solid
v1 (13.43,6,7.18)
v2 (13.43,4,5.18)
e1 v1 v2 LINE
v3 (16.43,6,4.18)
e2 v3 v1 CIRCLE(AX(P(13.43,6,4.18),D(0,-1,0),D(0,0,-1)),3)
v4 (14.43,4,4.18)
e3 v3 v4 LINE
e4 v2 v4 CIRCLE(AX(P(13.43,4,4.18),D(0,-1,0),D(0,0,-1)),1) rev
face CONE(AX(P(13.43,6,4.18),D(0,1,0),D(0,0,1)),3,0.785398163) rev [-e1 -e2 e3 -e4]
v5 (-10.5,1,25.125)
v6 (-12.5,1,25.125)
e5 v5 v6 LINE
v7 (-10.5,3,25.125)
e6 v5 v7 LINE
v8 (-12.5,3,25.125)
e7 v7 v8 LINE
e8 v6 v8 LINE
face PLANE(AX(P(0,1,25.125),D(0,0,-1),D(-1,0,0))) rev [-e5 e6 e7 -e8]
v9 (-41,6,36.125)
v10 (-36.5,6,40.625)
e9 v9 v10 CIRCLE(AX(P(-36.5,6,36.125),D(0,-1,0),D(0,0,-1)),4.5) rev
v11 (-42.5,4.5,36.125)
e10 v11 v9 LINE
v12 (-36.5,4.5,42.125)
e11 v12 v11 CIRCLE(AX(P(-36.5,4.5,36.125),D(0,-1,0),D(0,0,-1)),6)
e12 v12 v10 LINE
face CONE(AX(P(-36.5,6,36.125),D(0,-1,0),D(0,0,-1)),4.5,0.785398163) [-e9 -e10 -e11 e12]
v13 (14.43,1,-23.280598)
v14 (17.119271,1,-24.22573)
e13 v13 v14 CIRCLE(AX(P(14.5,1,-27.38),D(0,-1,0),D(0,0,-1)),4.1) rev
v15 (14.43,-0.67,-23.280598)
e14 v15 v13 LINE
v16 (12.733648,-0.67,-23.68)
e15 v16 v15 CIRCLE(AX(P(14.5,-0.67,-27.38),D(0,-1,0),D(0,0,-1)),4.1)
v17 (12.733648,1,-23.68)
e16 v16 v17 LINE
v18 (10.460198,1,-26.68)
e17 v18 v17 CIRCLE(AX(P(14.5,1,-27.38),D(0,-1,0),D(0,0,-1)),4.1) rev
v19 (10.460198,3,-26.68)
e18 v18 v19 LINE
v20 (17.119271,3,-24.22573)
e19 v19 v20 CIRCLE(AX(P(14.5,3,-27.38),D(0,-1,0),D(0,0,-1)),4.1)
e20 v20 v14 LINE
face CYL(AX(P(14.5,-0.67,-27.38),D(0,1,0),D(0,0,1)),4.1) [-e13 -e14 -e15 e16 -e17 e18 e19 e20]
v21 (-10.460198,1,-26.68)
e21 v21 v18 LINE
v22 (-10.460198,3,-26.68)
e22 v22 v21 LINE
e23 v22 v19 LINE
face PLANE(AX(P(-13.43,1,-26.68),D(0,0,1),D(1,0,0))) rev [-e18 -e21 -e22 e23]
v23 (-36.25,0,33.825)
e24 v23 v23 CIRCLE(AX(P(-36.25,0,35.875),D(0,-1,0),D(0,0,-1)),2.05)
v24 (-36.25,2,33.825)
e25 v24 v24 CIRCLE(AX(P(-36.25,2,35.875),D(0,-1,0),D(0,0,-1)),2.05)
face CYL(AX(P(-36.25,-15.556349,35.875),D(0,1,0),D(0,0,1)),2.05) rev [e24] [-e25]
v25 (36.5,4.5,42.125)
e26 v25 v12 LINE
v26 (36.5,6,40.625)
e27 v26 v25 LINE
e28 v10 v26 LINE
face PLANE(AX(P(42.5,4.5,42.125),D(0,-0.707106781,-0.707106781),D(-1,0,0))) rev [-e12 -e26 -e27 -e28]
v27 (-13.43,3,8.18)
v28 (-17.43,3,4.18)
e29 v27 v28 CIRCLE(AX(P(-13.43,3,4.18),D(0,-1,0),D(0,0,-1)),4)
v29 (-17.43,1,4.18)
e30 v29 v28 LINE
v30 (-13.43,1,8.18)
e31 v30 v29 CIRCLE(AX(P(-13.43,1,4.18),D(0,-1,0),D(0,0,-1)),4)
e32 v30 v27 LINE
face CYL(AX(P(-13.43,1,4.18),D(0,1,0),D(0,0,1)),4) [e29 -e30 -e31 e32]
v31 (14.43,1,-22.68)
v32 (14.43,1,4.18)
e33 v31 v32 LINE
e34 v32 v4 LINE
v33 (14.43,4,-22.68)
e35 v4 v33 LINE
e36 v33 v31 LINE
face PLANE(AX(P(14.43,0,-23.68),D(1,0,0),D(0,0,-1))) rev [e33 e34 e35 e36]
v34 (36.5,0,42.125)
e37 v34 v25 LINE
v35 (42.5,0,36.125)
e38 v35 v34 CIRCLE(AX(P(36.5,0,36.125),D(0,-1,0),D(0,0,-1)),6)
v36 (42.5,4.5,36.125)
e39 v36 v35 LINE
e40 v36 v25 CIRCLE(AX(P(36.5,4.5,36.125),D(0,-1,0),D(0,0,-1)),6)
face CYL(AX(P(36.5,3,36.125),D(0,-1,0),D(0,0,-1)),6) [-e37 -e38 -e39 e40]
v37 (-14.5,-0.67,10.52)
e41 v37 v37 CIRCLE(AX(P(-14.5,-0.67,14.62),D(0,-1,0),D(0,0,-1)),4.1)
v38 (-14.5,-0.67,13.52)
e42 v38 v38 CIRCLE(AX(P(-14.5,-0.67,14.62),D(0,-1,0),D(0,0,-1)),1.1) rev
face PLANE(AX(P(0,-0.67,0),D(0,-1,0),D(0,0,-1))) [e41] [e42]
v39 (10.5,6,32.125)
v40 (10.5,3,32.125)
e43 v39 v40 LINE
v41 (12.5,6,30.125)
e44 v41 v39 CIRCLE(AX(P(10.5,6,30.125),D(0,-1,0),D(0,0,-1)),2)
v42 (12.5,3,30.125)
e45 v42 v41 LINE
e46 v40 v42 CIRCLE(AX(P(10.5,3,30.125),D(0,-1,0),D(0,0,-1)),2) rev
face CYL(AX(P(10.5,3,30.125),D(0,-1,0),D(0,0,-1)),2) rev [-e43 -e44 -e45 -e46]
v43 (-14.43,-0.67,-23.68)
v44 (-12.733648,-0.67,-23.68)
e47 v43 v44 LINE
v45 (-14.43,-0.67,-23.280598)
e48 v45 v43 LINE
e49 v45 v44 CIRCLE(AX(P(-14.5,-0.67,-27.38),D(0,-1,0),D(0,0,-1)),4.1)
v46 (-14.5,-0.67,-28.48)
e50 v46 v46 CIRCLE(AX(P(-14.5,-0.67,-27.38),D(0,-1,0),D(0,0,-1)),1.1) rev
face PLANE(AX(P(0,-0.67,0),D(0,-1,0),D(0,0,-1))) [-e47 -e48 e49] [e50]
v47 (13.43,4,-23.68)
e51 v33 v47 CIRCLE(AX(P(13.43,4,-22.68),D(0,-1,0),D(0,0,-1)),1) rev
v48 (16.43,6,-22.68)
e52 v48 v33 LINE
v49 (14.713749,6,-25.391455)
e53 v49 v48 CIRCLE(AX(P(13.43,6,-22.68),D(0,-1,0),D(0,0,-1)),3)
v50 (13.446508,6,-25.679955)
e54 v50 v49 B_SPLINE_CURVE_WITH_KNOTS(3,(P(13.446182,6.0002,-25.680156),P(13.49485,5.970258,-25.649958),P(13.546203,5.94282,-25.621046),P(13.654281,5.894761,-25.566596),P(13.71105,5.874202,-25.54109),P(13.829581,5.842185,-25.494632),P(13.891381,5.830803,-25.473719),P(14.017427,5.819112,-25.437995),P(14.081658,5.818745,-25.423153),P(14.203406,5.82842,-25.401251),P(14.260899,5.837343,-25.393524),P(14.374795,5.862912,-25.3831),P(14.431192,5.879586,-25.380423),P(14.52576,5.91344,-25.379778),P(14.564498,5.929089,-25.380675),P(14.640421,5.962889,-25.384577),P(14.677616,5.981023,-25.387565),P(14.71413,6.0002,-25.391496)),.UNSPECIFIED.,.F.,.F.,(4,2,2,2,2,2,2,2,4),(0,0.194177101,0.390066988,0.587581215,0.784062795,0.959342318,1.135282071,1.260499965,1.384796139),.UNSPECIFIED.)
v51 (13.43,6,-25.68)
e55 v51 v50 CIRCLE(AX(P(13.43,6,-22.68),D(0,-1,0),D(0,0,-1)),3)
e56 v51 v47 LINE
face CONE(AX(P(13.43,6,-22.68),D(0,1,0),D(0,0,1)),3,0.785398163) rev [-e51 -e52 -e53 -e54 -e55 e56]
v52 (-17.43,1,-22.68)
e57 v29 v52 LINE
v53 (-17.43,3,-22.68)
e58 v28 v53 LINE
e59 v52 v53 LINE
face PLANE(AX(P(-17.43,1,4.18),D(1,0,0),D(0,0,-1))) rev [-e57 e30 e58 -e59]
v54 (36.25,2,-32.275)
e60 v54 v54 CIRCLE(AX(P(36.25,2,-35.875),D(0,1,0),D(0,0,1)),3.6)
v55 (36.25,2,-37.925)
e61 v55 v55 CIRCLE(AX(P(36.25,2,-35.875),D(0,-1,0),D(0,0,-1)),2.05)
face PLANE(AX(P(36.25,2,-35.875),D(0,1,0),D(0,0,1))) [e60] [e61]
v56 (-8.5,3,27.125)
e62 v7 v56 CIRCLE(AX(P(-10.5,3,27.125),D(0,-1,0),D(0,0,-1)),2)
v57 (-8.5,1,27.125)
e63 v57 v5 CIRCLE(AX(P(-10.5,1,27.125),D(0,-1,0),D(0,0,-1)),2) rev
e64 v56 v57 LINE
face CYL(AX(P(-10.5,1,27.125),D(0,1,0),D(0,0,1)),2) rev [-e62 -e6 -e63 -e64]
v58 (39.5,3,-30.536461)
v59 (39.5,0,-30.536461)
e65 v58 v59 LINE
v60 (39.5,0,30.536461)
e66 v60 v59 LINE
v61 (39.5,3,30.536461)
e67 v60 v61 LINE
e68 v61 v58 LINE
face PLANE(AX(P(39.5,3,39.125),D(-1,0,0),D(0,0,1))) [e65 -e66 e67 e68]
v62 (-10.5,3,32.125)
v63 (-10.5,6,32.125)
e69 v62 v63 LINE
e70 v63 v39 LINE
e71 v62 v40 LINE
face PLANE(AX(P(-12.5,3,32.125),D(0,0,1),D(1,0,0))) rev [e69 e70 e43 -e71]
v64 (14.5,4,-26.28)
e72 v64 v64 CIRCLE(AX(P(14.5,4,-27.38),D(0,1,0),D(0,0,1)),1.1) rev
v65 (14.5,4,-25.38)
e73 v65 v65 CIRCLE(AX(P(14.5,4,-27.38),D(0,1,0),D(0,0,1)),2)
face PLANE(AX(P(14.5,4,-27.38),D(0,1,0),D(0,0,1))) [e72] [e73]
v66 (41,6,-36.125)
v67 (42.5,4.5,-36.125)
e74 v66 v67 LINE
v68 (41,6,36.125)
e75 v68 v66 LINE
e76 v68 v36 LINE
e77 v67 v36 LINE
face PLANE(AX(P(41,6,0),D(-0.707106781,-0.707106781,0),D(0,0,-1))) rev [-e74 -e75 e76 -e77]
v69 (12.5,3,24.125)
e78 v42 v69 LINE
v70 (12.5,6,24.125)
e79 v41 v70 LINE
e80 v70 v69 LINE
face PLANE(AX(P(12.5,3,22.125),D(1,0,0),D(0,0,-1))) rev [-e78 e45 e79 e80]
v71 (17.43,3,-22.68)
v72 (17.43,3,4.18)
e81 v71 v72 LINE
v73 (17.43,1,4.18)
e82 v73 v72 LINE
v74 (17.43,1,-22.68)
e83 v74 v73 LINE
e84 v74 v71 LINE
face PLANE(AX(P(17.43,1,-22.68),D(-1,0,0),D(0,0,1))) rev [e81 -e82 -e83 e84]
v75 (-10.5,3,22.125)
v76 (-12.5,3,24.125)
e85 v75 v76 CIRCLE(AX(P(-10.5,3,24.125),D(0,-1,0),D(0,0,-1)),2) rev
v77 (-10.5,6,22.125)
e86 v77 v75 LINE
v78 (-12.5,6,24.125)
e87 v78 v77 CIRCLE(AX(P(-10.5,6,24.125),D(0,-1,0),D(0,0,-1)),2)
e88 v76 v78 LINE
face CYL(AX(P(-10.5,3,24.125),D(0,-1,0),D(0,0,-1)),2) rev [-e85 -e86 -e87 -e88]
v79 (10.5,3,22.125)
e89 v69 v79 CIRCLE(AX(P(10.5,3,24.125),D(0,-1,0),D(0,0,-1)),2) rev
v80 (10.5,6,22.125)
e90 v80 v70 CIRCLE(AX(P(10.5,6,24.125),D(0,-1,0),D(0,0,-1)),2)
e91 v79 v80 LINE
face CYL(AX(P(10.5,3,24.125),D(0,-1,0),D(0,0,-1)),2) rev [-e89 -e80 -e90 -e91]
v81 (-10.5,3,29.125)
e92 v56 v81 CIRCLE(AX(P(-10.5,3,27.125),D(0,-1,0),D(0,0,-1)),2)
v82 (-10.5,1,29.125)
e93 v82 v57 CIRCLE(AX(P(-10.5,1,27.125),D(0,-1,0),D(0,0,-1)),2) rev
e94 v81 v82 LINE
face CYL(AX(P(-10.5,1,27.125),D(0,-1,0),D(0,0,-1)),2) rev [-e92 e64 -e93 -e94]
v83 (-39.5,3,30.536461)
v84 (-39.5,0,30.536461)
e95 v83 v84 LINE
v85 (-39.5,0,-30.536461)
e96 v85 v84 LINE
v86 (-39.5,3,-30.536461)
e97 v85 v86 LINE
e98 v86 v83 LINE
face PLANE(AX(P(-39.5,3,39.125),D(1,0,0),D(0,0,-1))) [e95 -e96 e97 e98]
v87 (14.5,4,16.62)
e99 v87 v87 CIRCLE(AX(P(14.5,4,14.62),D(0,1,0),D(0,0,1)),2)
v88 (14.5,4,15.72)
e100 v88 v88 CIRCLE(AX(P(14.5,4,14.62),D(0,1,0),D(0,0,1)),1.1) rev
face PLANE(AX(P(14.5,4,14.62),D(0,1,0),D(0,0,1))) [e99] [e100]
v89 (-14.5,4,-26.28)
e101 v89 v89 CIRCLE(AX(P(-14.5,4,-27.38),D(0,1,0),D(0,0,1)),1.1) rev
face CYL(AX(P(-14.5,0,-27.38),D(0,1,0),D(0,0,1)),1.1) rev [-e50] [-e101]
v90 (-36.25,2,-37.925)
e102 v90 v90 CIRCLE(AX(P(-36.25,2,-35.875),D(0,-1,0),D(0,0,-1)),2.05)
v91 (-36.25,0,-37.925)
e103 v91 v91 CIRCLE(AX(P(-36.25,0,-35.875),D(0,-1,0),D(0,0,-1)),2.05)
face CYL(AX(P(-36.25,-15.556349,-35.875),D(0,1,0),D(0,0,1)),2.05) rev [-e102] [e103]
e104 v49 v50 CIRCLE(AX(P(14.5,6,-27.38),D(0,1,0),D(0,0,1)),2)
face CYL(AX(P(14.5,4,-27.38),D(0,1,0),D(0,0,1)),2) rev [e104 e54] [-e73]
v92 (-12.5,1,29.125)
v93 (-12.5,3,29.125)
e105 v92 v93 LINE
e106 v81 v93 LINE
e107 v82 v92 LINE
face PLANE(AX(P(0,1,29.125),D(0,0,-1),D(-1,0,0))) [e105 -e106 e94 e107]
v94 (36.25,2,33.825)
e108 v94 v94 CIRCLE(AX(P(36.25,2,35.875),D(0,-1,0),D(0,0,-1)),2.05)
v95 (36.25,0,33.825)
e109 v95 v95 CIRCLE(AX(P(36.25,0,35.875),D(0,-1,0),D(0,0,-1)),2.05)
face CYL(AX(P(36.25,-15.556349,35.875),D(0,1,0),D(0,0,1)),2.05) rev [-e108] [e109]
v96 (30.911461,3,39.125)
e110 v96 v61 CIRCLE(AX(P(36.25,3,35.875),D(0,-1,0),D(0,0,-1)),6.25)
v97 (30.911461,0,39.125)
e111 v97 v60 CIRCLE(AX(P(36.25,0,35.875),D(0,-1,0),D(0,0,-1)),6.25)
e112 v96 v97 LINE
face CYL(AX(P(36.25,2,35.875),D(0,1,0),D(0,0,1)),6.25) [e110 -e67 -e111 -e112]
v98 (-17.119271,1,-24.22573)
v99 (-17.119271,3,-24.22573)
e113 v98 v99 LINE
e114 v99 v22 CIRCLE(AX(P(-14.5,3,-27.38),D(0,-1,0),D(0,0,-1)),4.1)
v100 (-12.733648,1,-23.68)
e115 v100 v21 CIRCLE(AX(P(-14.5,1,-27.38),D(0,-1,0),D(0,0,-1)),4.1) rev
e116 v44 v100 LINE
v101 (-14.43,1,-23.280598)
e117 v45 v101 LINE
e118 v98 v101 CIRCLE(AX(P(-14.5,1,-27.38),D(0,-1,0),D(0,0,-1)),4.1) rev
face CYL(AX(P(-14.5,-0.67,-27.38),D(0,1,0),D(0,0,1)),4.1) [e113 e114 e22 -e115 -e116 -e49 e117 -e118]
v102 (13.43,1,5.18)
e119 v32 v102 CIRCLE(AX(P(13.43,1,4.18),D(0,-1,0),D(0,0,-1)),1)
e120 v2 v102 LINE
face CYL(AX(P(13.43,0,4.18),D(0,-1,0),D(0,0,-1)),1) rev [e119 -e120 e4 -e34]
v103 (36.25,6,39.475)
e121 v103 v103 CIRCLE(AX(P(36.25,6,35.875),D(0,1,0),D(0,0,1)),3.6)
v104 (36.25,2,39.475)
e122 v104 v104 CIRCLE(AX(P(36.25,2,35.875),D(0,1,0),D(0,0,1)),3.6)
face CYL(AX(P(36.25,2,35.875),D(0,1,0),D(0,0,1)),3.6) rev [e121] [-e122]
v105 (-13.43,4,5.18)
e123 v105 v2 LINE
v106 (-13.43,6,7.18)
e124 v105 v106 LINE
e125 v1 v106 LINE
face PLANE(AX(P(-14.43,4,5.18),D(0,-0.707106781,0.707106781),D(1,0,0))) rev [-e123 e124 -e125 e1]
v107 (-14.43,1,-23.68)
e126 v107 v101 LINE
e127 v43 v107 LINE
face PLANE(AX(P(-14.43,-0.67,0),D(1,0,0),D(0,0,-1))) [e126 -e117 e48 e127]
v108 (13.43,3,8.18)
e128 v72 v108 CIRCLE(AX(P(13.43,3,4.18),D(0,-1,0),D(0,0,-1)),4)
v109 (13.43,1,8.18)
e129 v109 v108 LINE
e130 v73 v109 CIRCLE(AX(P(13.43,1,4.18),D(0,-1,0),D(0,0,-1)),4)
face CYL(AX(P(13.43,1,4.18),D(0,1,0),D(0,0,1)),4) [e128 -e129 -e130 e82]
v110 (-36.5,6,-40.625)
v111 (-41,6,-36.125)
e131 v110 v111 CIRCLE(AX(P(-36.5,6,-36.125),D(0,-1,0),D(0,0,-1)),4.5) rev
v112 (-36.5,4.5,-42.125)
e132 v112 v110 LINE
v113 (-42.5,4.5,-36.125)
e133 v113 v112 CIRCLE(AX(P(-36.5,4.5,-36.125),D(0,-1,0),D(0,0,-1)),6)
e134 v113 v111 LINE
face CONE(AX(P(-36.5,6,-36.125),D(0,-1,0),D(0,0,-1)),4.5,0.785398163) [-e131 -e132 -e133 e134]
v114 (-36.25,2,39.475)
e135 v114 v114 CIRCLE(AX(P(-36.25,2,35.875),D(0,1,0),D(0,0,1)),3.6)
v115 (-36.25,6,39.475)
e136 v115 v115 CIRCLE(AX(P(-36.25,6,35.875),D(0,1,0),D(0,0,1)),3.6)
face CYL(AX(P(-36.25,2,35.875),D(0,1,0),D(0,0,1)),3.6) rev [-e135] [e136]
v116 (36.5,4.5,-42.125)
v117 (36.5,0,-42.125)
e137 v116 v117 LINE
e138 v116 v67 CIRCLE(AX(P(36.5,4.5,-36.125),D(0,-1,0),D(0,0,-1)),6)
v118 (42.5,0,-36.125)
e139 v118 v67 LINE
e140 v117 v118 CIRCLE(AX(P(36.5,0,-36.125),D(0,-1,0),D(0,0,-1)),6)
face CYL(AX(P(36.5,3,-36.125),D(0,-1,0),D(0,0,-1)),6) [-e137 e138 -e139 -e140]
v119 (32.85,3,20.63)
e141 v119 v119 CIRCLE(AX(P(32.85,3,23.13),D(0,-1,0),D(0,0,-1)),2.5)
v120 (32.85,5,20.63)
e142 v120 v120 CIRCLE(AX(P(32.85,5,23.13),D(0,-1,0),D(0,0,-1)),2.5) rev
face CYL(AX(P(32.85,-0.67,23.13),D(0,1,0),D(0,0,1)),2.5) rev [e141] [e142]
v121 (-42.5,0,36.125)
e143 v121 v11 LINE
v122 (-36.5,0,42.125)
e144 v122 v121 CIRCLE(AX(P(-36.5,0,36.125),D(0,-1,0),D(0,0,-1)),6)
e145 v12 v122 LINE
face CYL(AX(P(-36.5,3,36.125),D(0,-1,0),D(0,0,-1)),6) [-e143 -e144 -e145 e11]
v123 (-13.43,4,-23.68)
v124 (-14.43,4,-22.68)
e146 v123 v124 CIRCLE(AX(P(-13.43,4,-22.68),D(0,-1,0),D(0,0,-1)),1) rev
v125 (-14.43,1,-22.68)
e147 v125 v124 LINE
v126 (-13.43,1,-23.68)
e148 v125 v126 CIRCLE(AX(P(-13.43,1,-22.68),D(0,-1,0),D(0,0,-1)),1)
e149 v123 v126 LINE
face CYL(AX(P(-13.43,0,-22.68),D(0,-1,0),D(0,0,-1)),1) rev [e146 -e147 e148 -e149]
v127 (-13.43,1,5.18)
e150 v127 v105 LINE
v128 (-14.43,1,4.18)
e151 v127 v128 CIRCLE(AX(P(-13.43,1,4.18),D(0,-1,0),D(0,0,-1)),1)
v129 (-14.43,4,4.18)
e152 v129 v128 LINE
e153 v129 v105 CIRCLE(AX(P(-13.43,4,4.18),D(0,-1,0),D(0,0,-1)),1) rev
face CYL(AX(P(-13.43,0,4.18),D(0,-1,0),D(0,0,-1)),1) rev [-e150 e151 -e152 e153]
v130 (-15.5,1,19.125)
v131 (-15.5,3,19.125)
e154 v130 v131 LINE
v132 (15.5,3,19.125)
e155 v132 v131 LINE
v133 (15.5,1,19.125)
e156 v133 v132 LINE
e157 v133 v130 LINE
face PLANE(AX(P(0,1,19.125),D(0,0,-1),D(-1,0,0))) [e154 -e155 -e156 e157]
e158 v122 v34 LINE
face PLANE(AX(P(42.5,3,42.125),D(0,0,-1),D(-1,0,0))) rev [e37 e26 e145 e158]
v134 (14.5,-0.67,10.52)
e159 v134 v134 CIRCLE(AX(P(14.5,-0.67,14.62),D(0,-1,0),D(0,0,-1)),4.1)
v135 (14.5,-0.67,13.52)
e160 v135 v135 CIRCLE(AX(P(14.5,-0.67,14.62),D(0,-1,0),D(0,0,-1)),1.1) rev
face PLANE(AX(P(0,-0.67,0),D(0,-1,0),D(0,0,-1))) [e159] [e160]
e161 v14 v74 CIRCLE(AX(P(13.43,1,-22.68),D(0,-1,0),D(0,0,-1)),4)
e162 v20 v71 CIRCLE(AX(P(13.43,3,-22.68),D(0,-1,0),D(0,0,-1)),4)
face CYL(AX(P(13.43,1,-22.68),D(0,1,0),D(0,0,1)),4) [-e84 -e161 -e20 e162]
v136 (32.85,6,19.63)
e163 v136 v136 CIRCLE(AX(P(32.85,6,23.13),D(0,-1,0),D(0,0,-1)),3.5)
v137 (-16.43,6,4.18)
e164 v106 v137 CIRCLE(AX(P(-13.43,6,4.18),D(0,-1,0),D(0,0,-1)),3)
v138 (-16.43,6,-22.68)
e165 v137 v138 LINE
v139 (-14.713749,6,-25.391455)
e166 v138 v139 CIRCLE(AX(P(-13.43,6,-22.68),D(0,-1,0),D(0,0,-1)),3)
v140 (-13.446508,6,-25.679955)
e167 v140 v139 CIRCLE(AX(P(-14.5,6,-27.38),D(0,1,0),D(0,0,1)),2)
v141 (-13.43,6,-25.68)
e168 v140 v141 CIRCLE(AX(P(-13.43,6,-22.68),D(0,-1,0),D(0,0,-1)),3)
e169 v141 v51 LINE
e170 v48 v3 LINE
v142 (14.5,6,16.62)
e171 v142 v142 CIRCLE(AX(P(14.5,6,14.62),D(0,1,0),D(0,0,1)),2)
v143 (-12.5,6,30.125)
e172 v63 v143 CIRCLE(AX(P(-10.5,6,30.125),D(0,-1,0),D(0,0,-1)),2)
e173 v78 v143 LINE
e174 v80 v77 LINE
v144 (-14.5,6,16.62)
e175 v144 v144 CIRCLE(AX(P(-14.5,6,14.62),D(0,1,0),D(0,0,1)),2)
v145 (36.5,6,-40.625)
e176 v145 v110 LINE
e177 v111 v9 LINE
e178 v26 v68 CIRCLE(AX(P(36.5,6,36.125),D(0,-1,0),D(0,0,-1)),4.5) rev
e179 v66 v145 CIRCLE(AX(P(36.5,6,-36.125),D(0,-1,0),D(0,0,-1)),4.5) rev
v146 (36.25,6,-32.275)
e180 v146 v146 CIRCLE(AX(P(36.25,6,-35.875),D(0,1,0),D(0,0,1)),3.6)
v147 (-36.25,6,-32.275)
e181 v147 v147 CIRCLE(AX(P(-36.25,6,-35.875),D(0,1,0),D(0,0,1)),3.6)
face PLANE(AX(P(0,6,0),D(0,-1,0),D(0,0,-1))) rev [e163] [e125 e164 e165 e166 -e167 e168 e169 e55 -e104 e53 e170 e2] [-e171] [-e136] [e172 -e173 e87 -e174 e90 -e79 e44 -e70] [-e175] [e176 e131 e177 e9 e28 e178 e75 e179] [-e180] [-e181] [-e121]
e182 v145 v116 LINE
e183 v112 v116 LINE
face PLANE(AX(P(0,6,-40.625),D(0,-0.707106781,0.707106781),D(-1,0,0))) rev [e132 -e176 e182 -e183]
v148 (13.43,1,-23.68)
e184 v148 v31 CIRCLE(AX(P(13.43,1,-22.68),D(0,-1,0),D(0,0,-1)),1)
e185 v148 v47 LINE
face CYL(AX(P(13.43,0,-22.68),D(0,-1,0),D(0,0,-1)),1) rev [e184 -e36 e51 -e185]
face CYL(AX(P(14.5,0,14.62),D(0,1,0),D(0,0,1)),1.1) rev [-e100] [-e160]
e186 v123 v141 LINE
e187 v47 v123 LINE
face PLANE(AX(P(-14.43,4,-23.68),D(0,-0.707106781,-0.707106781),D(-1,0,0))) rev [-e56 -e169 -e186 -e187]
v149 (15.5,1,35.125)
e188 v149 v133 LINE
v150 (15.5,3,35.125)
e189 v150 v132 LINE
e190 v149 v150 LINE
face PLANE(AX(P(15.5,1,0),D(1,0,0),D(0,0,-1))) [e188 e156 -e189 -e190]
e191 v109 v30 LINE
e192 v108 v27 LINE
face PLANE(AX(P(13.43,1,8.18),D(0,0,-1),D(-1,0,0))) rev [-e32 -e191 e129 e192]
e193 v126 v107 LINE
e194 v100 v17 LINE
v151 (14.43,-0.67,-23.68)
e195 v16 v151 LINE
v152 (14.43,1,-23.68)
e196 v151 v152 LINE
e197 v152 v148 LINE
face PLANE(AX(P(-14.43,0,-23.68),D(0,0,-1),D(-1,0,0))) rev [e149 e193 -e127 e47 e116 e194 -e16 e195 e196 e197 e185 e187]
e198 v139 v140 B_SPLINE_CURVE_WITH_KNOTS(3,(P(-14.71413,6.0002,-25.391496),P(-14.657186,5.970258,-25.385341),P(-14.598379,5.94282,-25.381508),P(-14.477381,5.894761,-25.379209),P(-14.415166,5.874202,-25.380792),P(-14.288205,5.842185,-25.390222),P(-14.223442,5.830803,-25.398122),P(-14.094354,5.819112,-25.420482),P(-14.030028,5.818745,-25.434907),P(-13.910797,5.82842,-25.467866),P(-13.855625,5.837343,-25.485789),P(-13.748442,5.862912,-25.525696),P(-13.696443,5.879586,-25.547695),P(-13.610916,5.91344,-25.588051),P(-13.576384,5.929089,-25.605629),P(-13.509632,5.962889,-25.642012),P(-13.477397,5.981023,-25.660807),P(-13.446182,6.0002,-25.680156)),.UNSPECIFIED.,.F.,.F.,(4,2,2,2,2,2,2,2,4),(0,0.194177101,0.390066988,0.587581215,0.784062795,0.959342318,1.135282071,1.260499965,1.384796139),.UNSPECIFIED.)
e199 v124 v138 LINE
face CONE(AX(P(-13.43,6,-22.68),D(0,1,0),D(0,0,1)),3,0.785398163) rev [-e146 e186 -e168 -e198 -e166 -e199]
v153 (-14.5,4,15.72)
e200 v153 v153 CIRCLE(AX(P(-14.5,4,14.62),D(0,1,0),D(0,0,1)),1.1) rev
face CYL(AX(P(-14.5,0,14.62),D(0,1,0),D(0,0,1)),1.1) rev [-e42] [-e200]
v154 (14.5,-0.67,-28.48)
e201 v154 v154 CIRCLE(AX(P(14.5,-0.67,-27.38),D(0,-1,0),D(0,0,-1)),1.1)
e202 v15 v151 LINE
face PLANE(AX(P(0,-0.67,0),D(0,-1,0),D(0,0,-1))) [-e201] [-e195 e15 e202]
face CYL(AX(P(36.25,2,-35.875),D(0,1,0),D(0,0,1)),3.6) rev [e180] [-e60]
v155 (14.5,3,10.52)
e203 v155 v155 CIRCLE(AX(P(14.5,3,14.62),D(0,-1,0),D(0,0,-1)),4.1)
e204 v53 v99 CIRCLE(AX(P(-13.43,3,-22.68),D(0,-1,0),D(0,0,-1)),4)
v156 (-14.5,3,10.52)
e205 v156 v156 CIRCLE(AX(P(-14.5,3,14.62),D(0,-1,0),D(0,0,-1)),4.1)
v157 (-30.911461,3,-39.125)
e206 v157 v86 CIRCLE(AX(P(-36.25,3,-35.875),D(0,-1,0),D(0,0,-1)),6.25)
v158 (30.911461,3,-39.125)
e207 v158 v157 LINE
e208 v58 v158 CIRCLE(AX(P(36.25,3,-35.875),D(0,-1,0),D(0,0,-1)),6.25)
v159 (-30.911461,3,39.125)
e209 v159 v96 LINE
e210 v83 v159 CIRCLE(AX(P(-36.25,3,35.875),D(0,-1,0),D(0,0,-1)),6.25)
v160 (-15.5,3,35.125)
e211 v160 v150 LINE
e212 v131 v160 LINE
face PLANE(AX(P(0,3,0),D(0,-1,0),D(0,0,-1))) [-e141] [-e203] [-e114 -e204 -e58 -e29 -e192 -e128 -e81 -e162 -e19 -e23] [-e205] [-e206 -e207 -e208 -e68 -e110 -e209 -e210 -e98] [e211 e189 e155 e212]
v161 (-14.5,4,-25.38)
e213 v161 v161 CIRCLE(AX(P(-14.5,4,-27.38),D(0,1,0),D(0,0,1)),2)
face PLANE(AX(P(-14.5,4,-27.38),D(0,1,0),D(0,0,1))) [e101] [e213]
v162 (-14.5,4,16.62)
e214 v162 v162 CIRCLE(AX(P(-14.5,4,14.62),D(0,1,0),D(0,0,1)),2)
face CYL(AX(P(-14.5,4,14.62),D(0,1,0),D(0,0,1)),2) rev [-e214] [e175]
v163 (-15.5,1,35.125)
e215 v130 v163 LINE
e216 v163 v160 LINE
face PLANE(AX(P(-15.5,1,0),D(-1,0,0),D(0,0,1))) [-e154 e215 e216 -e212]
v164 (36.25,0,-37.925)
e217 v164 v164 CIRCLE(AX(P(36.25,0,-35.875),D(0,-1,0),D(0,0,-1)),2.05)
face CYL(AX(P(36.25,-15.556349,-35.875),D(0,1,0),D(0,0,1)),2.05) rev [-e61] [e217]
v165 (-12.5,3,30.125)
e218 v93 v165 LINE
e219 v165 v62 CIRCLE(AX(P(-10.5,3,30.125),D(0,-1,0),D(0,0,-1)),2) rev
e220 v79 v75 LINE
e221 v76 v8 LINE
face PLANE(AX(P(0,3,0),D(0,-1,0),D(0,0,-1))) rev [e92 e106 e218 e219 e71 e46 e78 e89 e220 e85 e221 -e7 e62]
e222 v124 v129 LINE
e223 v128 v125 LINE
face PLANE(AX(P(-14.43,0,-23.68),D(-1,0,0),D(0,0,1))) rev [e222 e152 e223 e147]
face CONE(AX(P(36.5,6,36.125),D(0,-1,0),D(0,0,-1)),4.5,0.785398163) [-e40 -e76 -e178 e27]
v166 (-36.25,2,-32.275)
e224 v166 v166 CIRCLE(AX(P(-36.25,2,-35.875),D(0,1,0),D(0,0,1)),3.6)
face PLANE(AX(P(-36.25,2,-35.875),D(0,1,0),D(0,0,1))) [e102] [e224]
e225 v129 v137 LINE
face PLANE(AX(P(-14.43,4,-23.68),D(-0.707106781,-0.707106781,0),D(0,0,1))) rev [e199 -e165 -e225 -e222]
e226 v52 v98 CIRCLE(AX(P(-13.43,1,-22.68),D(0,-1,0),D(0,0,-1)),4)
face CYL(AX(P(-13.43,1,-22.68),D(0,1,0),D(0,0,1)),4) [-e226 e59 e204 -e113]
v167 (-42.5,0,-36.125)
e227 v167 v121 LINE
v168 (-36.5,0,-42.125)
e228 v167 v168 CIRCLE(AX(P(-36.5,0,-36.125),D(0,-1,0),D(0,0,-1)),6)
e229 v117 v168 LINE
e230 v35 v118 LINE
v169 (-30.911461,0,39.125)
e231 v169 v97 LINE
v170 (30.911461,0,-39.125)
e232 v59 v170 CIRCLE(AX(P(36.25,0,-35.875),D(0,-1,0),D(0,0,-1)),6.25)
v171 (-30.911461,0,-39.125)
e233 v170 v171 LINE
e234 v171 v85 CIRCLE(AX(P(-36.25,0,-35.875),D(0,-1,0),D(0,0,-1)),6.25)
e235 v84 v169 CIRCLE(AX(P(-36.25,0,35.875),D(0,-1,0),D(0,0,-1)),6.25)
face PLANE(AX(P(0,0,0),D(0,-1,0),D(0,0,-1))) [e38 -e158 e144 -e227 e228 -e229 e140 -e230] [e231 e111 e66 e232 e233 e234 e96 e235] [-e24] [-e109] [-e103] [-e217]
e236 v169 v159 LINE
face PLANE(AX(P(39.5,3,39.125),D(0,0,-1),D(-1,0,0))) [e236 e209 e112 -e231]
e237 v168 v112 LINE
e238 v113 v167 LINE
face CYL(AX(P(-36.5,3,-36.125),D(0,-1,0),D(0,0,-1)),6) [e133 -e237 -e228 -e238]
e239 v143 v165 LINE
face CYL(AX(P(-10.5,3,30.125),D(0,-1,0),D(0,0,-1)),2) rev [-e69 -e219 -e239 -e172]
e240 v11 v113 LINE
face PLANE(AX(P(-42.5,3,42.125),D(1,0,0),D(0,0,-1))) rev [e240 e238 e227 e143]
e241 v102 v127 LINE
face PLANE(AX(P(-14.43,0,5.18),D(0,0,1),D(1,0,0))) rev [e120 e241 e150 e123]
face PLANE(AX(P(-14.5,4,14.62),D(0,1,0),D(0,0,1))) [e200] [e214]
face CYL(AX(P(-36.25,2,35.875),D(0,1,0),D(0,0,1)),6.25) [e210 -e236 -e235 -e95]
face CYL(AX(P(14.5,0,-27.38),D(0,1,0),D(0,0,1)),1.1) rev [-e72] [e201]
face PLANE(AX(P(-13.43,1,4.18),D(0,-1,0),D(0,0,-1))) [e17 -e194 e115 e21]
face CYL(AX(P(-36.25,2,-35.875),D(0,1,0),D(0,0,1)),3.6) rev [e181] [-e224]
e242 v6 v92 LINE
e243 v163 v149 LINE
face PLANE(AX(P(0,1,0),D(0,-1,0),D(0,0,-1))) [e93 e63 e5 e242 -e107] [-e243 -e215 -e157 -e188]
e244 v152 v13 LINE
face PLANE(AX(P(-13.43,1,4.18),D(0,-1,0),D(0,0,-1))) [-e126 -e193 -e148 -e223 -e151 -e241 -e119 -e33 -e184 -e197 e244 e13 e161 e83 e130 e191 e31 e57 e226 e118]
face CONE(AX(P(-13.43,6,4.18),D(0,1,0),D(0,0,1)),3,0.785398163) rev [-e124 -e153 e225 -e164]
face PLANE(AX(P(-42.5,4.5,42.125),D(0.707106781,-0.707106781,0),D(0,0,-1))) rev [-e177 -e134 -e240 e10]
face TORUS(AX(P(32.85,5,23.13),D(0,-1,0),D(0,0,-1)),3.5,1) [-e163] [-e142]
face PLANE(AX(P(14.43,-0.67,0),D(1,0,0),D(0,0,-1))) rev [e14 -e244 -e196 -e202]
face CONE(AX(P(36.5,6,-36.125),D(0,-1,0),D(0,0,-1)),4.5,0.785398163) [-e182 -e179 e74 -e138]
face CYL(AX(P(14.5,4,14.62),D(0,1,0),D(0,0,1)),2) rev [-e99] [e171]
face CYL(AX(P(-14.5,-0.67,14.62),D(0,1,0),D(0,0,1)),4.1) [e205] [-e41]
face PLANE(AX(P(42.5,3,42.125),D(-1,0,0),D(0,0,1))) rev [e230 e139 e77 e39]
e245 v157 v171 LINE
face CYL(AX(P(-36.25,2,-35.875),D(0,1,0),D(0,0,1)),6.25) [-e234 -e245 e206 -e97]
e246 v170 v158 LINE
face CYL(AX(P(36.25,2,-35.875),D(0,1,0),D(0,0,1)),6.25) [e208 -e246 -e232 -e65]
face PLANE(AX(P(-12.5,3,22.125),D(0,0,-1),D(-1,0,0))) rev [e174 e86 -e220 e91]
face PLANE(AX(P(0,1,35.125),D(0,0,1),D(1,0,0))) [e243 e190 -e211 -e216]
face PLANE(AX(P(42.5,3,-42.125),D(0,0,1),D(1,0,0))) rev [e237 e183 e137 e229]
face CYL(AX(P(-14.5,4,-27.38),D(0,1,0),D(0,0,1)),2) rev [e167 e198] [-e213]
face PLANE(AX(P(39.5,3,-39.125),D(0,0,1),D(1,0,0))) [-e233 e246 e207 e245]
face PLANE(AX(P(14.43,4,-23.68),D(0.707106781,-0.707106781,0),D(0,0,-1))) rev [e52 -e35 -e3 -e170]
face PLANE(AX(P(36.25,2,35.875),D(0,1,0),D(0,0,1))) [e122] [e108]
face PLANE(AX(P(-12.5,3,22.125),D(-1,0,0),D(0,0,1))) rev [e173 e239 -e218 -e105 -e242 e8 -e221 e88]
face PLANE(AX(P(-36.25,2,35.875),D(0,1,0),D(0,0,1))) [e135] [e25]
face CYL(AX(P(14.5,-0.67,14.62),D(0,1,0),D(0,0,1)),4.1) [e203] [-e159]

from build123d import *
from build123d.topology import SkipClean

# Parameters (mm, degrees)
SKETCH1_W                 = 85
SKETCH1_H                 = 84.25
SKETCH1_W_2               = 79
SKETCH1_H_2               = 78.25
BOSS_EXTRUDE1_DEPTH       = 3
BOSS_EXTRUDE2_START       = 3
SKETCH1_2_W               = 85
SKETCH1_2_H               = 84.25
SKETCH1_2_W_2             = 79
SKETCH1_2_H_2             = 78.25
BOSS_EXTRUDE2_DEPTH       = 3
FILLET1_R                 = 3
FILLET2_R                 = 6
CHAMFER1_SIZE             = 1.5
SKETCH3_W                 = 28.86
SKETCH3_H                 = 28.86
CUT_EXTRUDE1_DEPTH        = 61.139551254
FILLET3_R                 = 1
BOSS_EXTRUDE3_START       = 2
BOSS_EXTRUDE3_DEPTH       = 2
CHAMFER2_SIZE             = 2
SKETCH5_R                 = 1.1
CUT_EXTRUDE2_DEPTH        = 61.139551254
BOSS_EXTRUDE4_OUTLINE_R   = 1.1
BOSS_EXTRUDE4_OUTLINE_R_2 = 4.1
BOSS_EXTRUDE4_DEPTH       = 3.67
SKETCH7_R                 = 2.5
CUT_EXTRUDE3_DEPTH        = 61.210086572
SKETCH8_R                 = 2
CUT_EXTRUDE4_DEPTH        = 2
FILLET4_R                 = 1
SKETCH9_R                 = 2.05
CUT_EXTRUDE5_DEPTH        = 61.210086572
SKETCH9_3_R               = 3.6
SKETCH9_3_R_2             = 2.05
CUT_EXTRUDE6_DEPTH        = 4
BOSS_EXTRUDE7_START       = -3
SKETCH10_R                = 3.6
BOSS_EXTRUDE7_DEPTH       = 1
BOSS_EXTRUDE8_START       = -4
SKETCH10_4_R              = 3.6
SKETCH10_4_R_2            = 2.05
BOSS_EXTRUDE8_DEPTH       = 2
SKETCH11_W                = 25
SKETCH11_H                = 10
CUT_EXTRUDE7_DEPTH        = 3
SKETCH12_W                = 31
SKETCH12_H                = 16
BOSS_EXTRUDE9_DEPTH       = 2
FILLET5_R                 = 2


# Read off the part's stored shape, not the designer's step: Boss-Extrude4
with BuildPart() as part:
    # Sketch1 → Boss-Extrude1 (new body)
    with BuildSketch(Plane(origin=(0, 0, 0), x_dir=(1, 0, 0), z_dir=(0, 1, 0))):
        Rectangle(SKETCH1_W, SKETCH1_H)
        Rectangle(SKETCH1_W_2, SKETCH1_H_2, mode=Mode.SUBTRACT)
    extrude(amount=BOSS_EXTRUDE1_DEPTH)

    # Sketch1<2> → Boss-Extrude2 (add)
    # profile 1 of 2: a face of its own
    with BuildSketch(Plane(origin=(0, 0, 0), x_dir=(1, 0, 0), z_dir=(0, 1, 0)).offset(BOSS_EXTRUDE2_START)):
        Rectangle(SKETCH1_2_W, SKETCH1_2_H)
        Rectangle(SKETCH1_2_W_2, SKETCH1_2_H_2, mode=Mode.SUBTRACT)
    # profile 2 of 2: a face of its own
    with BuildSketch(Plane(origin=(0, 0, 0), x_dir=(1, 0, 0), z_dir=(0, 1, 0)).offset(BOSS_EXTRUDE2_START)):
        Rectangle(SKETCH1_2_W_2, SKETCH1_2_H_2)
    extrude(amount=BOSS_EXTRUDE2_DEPTH)

    # Fillet1
    fillet1_edges = [part.edges().sort_by_distance(p)[0] for p in [
        (-39.5, 1.5, -39.125),
        (-39.5, 1.5, 39.125),
        (39.5, 1.5, 39.125),
        (39.5, 1.5, -39.125),
    ]]
    fillet(fillet1_edges, radius=FILLET1_R)

    # Fillet2
    fillet2_edges = [part.edges().sort_by_distance(p)[0] for p in [
        (-42.5, 3, 42.125),
        (-42.5, 3, -42.125),
        (42.5, 3, -42.125),
        (42.5, 3, 42.125),
    ]]
    fillet(fillet2_edges, radius=FILLET2_R)

    # Chamfer1
    chamfer1_edges = [part.edges().sort_by_distance(p)[0] for p in [
        (42.5, 6, 0),
        (0, 6, 42.125),
        (0, 6, -42.125),
        (-42.5, 6, 0),
        (-40.742640687, 6, 40.367640687),
        (-40.742640687, 6, -40.367640687),
        (40.742640687, 6, -40.367640687),
        (40.742640687, 6, 40.367640687),
    ]]
    chamfer(chamfer1_edges, length=CHAMFER1_SIZE)

    # Sketch3 → Cut-Extrude1 (cut, through all)
    with BuildSketch(Plane(origin=(0, 6, 0), x_dir=(1, 0, 0), z_dir=(0, 1, 0))):
        with Locations((0, 9.25)):
            Rectangle(SKETCH3_W, SKETCH3_H)
    extrude(amount=-CUT_EXTRUDE1_DEPTH, mode=Mode.SUBTRACT)

    # Fillet3
    fillet3_edges = [part.edges().sort_by_distance(p)[0] for p in [
        (14.43, 4.5, -23.68),
        (14.43, 4.5, 5.18),
        (-14.43, 4.5, 5.18),
        (-14.43, 4.5, -23.68),
    ]]
    fillet(fillet3_edges, radius=FILLET3_R)

    # Sketch4 → Boss-Extrude3 (add)
    with BuildSketch(Plane.XZ.offset(-3).offset(BOSS_EXTRUDE3_START)):
        with BuildLine():
            Line((-17.43, 4.18), (-17.43, -22.68))
            ThreePointArc((-17.43, -22.68), (-16.258427125, -25.508427125), (-13.43, -26.68))
            Line((-13.43, -26.68), (13.43, -26.68))
            ThreePointArc((13.43, -26.68), (16.258427125, -25.508427125), (17.43, -22.68))
            Line((17.43, -22.68), (17.43, 4.18))
            ThreePointArc((17.43, 4.18), (16.258427125, 7.008427125), (13.43, 8.18))
            Line((13.43, 8.18), (-13.43, 8.18))
            ThreePointArc((-13.43, 8.18), (-16.258427125, 7.008427125), (-17.43, 4.18))
        make_face()
        with BuildLine():
            Line((-14.43, 4.18), (-14.43, -22.68))
            ThreePointArc((-14.43, -22.68), (-14.137106781, -23.387106781), (-13.43, -23.68))
            Line((-13.43, -23.68), (13.43, -23.68))
            ThreePointArc((13.43, -23.68), (14.137106781, -23.387106781), (14.43, -22.68))
            Line((14.43, -22.68), (14.43, 4.18))
            ThreePointArc((14.43, 4.18), (14.137106781, 4.887106781), (13.43, 5.18))
            Line((13.43, 5.18), (-13.43, 5.18))
            ThreePointArc((-13.43, 5.18), (-14.137106781, 4.887106781), (-14.43, 4.18))
        make_face(mode=Mode.SUBTRACT)
    extrude(amount=-BOSS_EXTRUDE3_DEPTH)

    # Chamfer2
    chamfer2_edges = [part.edges().sort_by_distance(p)[0] for p in [
        (14.43, 6, -9.25),
        (0, 6, 5.18),
        (-14.43, 6, -9.25),
        (0, 6, -23.68),
        (14.137106781, 6, 4.887106781),
        (-14.137106781, 6, 4.887106781),
        (-14.137106781, 6, -23.387106781),
        (14.137106781, 6, -23.387106781),
    ]]
    chamfer(chamfer2_edges, length=CHAMFER2_SIZE)

    # Sketch5 → Cut-Extrude2 (cut, through all)
    with BuildSketch(Plane(origin=(0, 6, 0), x_dir=(1, 0, 0), z_dir=(0, 1, 0))):
        with Locations(Location((-14.5, 27.38, 0), (0, 0, 270))):
            Circle(SKETCH5_R)
        with Locations(Location((14.5, 27.38, 0), (0, 0, 270))):
            Circle(SKETCH5_R)
        with Locations(Location((-14.5, -14.62, 0), (0, 0, 270))):
            Circle(SKETCH5_R)
        with Locations(Location((14.5, -14.62, 0), (0, 0, 270))):
            Circle(SKETCH5_R)
    extrude(amount=-CUT_EXTRUDE2_DEPTH, mode=Mode.SUBTRACT)

    # Boss-Extrude4 outline → Boss-Extrude4 (add)
    # profile 1 of 4: a face of its own
    with SkipClean():  # the faces are left unmerged after this step: merging them gives an invalid solid
        with BuildSketch(Plane.XZ.offset(-3)):
            with BuildLine():
                Line((14.43, -23.280597605), (14.43, -23.68))
                Line((14.43, -23.68), (12.733647827, -23.68))
                ThreePointArc((12.733647827, -23.68), (15.439642427, -31.370873602), (14.43, -23.280597605))
            make_face()
            with Locations((14.5, -27.38)):
                Circle(BOSS_EXTRUDE4_OUTLINE_R, mode=Mode.SUBTRACT)
        # profile 2 of 4: a face of its own
        with BuildSketch(Plane.XZ.offset(-3)):
            with BuildLine():
                Line((-12.733647827, -23.68), (-14.43, -23.68))
                Line((-14.43, -23.68), (-14.43, -23.280597605))
                ThreePointArc((-14.43, -23.280597605), (-15.439642427, -31.370873602), (-12.733647827, -23.68))
            make_face()
            with Locations((-14.5, -27.38)):
                Circle(BOSS_EXTRUDE4_OUTLINE_R, mode=Mode.SUBTRACT)
        # profile 3 of 4: a face of its own
        with BuildSketch(Plane.XZ.offset(-3)):
            with Locations((14.5, 14.62)):
                Circle(BOSS_EXTRUDE4_OUTLINE_R_2)
            with Locations((14.5, 14.62)):
                Circle(BOSS_EXTRUDE4_OUTLINE_R, mode=Mode.SUBTRACT)
        # profile 4 of 4: a face of its own
        with BuildSketch(Plane.XZ.offset(-3)):
            with Locations((-14.5, 14.62)):
                Circle(BOSS_EXTRUDE4_OUTLINE_R_2)
            with Locations((-14.5, 14.62)):
                Circle(BOSS_EXTRUDE4_OUTLINE_R, mode=Mode.SUBTRACT)
        extrude(amount=BOSS_EXTRUDE4_DEPTH)

    # Sketch7 → Cut-Extrude3 (cut, through all)
    with SkipClean():  # the faces are left unmerged after this step: merging them gives an invalid solid
        with BuildSketch(Plane(origin=(0, 6, 0), x_dir=(1, 0, 0), z_dir=(0, 1, 0))):
            with Locations(Location((32.85, -23.13, 0), (0, 0, 270))):
                Circle(SKETCH7_R)
        extrude(amount=-CUT_EXTRUDE3_DEPTH, mode=Mode.SUBTRACT)

    # Sketch8 → Cut-Extrude4 (cut)
    with SkipClean():  # the faces are left unmerged after this step: merging them gives an invalid solid
        with BuildSketch(Plane(origin=(0, 6, 0), x_dir=(1, 0, 0), z_dir=(0, 1, 0))):
            with Locations(Location((-14.5, 27.38, 0), (0, 0, 270))):
                Circle(SKETCH8_R)
            with Locations(Location((14.5, 27.38, 0), (0, 0, 270))):
                Circle(SKETCH8_R)
            with Locations(Location((14.5, -14.62, 0), (0, 0, 270))):
                Circle(SKETCH8_R)
            with Locations(Location((-14.5, -14.62, 0), (0, 0, 270))):
                Circle(SKETCH8_R)
        extrude(amount=-CUT_EXTRUDE4_DEPTH, mode=Mode.SUBTRACT)
    add(part.part.scale(1), mode=Mode.REPLACE)  # the faces are merged on a copy

    # Fillet4
    fillet4_edges = [part.edges().sort_by_distance(p)[0] for p in [
        (32.85, 6, 20.63),
    ]]
    fillet(fillet4_edges, radius=FILLET4_R)

    # Sketch9 → Cut-Extrude5 (cut, through all)
    with BuildSketch(Plane(origin=(0, 6, 0), x_dir=(1, 0, 0), z_dir=(0, 1, 0))):
        with Locations(Location((-36.25, 35.875, 0), (0, 0, 270))):
            Circle(SKETCH9_R)
        with Locations(Location((36.25, -35.875, 0), (0, 0, 270))):
            Circle(SKETCH9_R)
        with Locations(Location((-36.25, -35.875, 0), (0, 0, 270))):
            Circle(SKETCH9_R)
        with Locations(Location((36.25, 35.875, 0), (0, 0, 270))):
            Circle(SKETCH9_R)
    extrude(amount=-CUT_EXTRUDE5_DEPTH, mode=Mode.SUBTRACT)

    # Sketch9<3> → Cut-Extrude6 (cut)
    # profile 1 of 4: a face of its own
    with BuildSketch(Plane(origin=(0, 6, 0), x_dir=(1, 0, 0), z_dir=(0, 1, 0))):
        with Locations(Location((-36.25, 35.875, 0), (0, 0, 270))):
            Circle(SKETCH9_3_R)
        with Locations((-36.25, 35.875)):
            Circle(SKETCH9_3_R_2, mode=Mode.SUBTRACT)
    # profile 2 of 4: a face of its own
    with BuildSketch(Plane(origin=(0, 6, 0), x_dir=(1, 0, 0), z_dir=(0, 1, 0))):
        with Locations(Location((-36.25, -35.875, 0), (0, 0, 270))):
            Circle(SKETCH9_3_R)
        with Locations((-36.25, -35.875)):
            Circle(SKETCH9_3_R_2, mode=Mode.SUBTRACT)
    # profile 3 of 4: a face of its own
    with BuildSketch(Plane(origin=(0, 6, 0), x_dir=(1, 0, 0), z_dir=(0, 1, 0))):
        with Locations(Location((36.25, -35.875, 0), (0, 0, 270))):
            Circle(SKETCH9_3_R)
        with Locations((36.25, -35.875)):
            Circle(SKETCH9_3_R_2, mode=Mode.SUBTRACT)
    # profile 4 of 4: a face of its own
    with BuildSketch(Plane(origin=(0, 6, 0), x_dir=(1, 0, 0), z_dir=(0, 1, 0))):
        with Locations(Location((36.25, 35.875, 0), (0, 0, 270))):
            Circle(SKETCH9_3_R)
        with Locations((36.25, 35.875)):
            Circle(SKETCH9_3_R_2, mode=Mode.SUBTRACT)
    extrude(amount=-CUT_EXTRUDE6_DEPTH, mode=Mode.SUBTRACT)

    # Sketch10 → Boss-Extrude7 (add)
    # profile 1 of 4: a face of its own
    with BuildSketch(Plane(origin=(0, 6, 0), x_dir=(1, 0, 0), z_dir=(0, 1, 0)).offset(BOSS_EXTRUDE7_START)):
        with BuildLine():
            ThreePointArc((-30, 35.875), (-30.573287923, 38.489849899), (-32.187980798, 40.625))
            Line((-32.187980798, 40.625), (-36.5, 40.625))
            ThreePointArc((-36.5, 40.625), (-39.681980515, 39.306980515), (-41, 36.125))
            Line((-41, 36.125), (-41, 31.812980798))
            ThreePointArc((-41, 31.812980798), (-34.084936491, 30.0119803), (-30, 35.875))
        make_face()
        with Locations(Location((-36.25, 35.875, 0), (0, 0, 270))):
            Circle(SKETCH10_R, mode=Mode.SUBTRACT)
    # profile 2 of 4: a face of its own
    with BuildSketch(Plane(origin=(0, 6, 0), x_dir=(1, 0, 0), z_dir=(0, 1, 0)).offset(BOSS_EXTRUDE7_START)):
        with BuildLine():
            Line((36.5, 40.625), (32.187980798, 40.625))
            ThreePointArc((32.187980798, 40.625), (31.830582618, 31.455582618), (41, 31.812980798))
            Line((41, 31.812980798), (41, 36.125))
            ThreePointArc((41, 36.125), (39.681980515, 39.306980515), (36.5, 40.625))
        make_face()
        with Locations(Location((36.25, 35.875, 0), (0, 0, 270))):
            Circle(SKETCH10_R, mode=Mode.SUBTRACT)
    # profile 3 of 4: a face of its own
    with BuildSketch(Plane(origin=(0, 6, 0), x_dir=(1, 0, 0), z_dir=(0, 1, 0)).offset(BOSS_EXTRUDE7_START)):
        with BuildLine():
            Line((41, -36.125), (41, -31.812980798))
            ThreePointArc((41, -31.812980798), (31.830582618, -31.455582618), (32.187980798, -40.625))
            Line((32.187980798, -40.625), (36.5, -40.625))
            ThreePointArc((36.5, -40.625), (39.681980515, -39.306980515), (41, -36.125))
        make_face()
        with Locations(Location((36.25, -35.875, 0), (0, 0, 270))):
            Circle(SKETCH10_R, mode=Mode.SUBTRACT)
    # profile 4 of 4: a face of its own
    with BuildSketch(Plane(origin=(0, 6, 0), x_dir=(1, 0, 0), z_dir=(0, 1, 0)).offset(BOSS_EXTRUDE7_START)):
        with BuildLine():
            ThreePointArc((-30, -35.875), (-34.084936491, -30.0119803), (-41, -31.812980798))
            Line((-41, -31.812980798), (-41, -36.125))
            ThreePointArc((-41, -36.125), (-39.681980515, -39.306980515), (-36.5, -40.625))
            Line((-36.5, -40.625), (-32.187980798, -40.625))
            ThreePointArc((-32.187980798, -40.625), (-30.573287923, -38.489849899), (-30, -35.875))
        make_face()
        with Locations(Location((-36.25, -35.875, 0), (0, 0, 270))):
            Circle(SKETCH10_R, mode=Mode.SUBTRACT)
    extrude(amount=-BOSS_EXTRUDE7_DEPTH)

    # Sketch10<4> → Boss-Extrude8 (add)
    # profile 1 of 8: a face of its own
    with BuildSketch(Plane(origin=(0, 6, 0), x_dir=(1, 0, 0), z_dir=(0, 1, 0)).offset(BOSS_EXTRUDE8_START)):
        with BuildLine():
            Line((36.5, 40.625), (32.187980798, 40.625))
            ThreePointArc((32.187980798, 40.625), (31.830582618, 31.455582618), (41, 31.812980798))
            Line((41, 31.812980798), (41, 36.125))
            ThreePointArc((41, 36.125), (39.681980515, 39.306980515), (36.5, 40.625))
        make_face()
        with Locations(Location((36.25, 35.875, 0), (0, 0, 270))):
            Circle(SKETCH10_4_R, mode=Mode.SUBTRACT)
    # profile 2 of 8: a face of its own
    with BuildSketch(Plane(origin=(0, 6, 0), x_dir=(1, 0, 0), z_dir=(0, 1, 0)).offset(BOSS_EXTRUDE8_START)):
        with Locations(Location((36.25, 35.875, 0), (0, 0, 270))):
            Circle(SKETCH10_4_R)
        with Locations(Location((36.25, 35.875, 0), (0, 0, 90))):
            Circle(SKETCH10_4_R_2, mode=Mode.SUBTRACT)
    # profile 3 of 8: a face of its own
    with BuildSketch(Plane(origin=(0, 6, 0), x_dir=(1, 0, 0), z_dir=(0, 1, 0)).offset(BOSS_EXTRUDE8_START)):
        with BuildLine():
            Line((41, -36.125), (41, -31.812980798))
            ThreePointArc((41, -31.812980798), (31.830582618, -31.455582618), (32.187980798, -40.625))
            Line((32.187980798, -40.625), (36.5, -40.625))
            ThreePointArc((36.5, -40.625), (39.681980515, -39.306980515), (41, -36.125))
        make_face()
        with Locations(Location((36.25, -35.875, 0), (0, 0, 270))):
            Circle(SKETCH10_4_R, mode=Mode.SUBTRACT)
    # profile 4 of 8: a face of its own
    with BuildSketch(Plane(origin=(0, 6, 0), x_dir=(1, 0, 0), z_dir=(0, 1, 0)).offset(BOSS_EXTRUDE8_START)):
        with Locations(Location((36.25, -35.875, 0), (0, 0, 270))):
            Circle(SKETCH10_4_R)
        with Locations(Location((36.25, -35.875, 0), (0, 0, 90))):
            Circle(SKETCH10_4_R_2, mode=Mode.SUBTRACT)
    # profile 5 of 8: a face of its own
    with BuildSketch(Plane(origin=(0, 6, 0), x_dir=(1, 0, 0), z_dir=(0, 1, 0)).offset(BOSS_EXTRUDE8_START)):
        with BuildLine():
            ThreePointArc((-30, -35.875), (-34.084936491, -30.0119803), (-41, -31.812980798))
            Line((-41, -31.812980798), (-41, -36.125))
            ThreePointArc((-41, -36.125), (-39.681980515, -39.306980515), (-36.5, -40.625))
            Line((-36.5, -40.625), (-32.187980798, -40.625))
            ThreePointArc((-32.187980798, -40.625), (-30.573287923, -38.489849899), (-30, -35.875))
        make_face()
        with Locations(Location((-36.25, -35.875, 0), (0, 0, 270))):
            Circle(SKETCH10_4_R, mode=Mode.SUBTRACT)
    # profile 6 of 8: a face of its own
    with BuildSketch(Plane(origin=(0, 6, 0), x_dir=(1, 0, 0), z_dir=(0, 1, 0)).offset(BOSS_EXTRUDE8_START)):
        with Locations(Location((-36.25, -35.875, 0), (0, 0, 270))):
            Circle(SKETCH10_4_R)
        with Locations(Location((-36.25, -35.875, 0), (0, 0, 90))):
            Circle(SKETCH10_4_R_2, mode=Mode.SUBTRACT)
    # profile 7 of 8: a face of its own
    with BuildSketch(Plane(origin=(0, 6, 0), x_dir=(1, 0, 0), z_dir=(0, 1, 0)).offset(BOSS_EXTRUDE8_START)):
        with BuildLine():
            ThreePointArc((-30, 35.875), (-30.573287923, 38.489849899), (-32.187980798, 40.625))
            Line((-32.187980798, 40.625), (-36.5, 40.625))
            ThreePointArc((-36.5, 40.625), (-39.681980515, 39.306980515), (-41, 36.125))
            Line((-41, 36.125), (-41, 31.812980798))
            ThreePointArc((-41, 31.812980798), (-34.084936491, 30.0119803), (-30, 35.875))
        make_face()
        with Locations(Location((-36.25, 35.875, 0), (0, 0, 270))):
            Circle(SKETCH10_4_R, mode=Mode.SUBTRACT)
    # profile 8 of 8: a face of its own
    with BuildSketch(Plane(origin=(0, 6, 0), x_dir=(1, 0, 0), z_dir=(0, 1, 0)).offset(BOSS_EXTRUDE8_START)):
        with Locations(Location((-36.25, 35.875, 0), (0, 0, 270))):
            Circle(SKETCH10_4_R)
        with Locations(Location((-36.25, 35.875, 0), (0, 0, 90))):
            Circle(SKETCH10_4_R_2, mode=Mode.SUBTRACT)
    extrude(amount=-BOSS_EXTRUDE8_DEPTH)

    # Sketch11 → Cut-Extrude7 (cut)
    with BuildSketch(Plane(origin=(0, 6, 0), x_dir=(1, 0, 0), z_dir=(0, 1, 0))):
        with Locations((0, -27.125)):
            Rectangle(SKETCH11_W, SKETCH11_H)
    extrude(amount=-CUT_EXTRUDE7_DEPTH, mode=Mode.SUBTRACT)

    # Sketch12 → Boss-Extrude9 (add)
    # profile 1 of 2: a face of its own
    with BuildSketch(Plane.XZ.offset(-3)):
        with Locations((0, 27.125)):
            Rectangle(SKETCH12_W, SKETCH12_H)
        Polygon((-12.5, 32.125), (12.5, 32.125), (12.5, 22.125), (-12.5, 22.125), (-12.5, 25.125), (-12.5, 29.125), align=None, mode=Mode.SUBTRACT)
    # profile 2 of 2: a face of its own
    with BuildSketch(Plane.XZ.offset(-3)):
        Polygon((12.5, 22.125), (12.5, 32.125), (-12.5, 32.125), (-12.5, 29.125), (-8.5, 29.125), (-8.5, 25.125), (-12.5, 25.125), (-12.5, 22.125), align=None)
    extrude(amount=BOSS_EXTRUDE9_DEPTH)

    # Fillet5
    fillet5_edges = [part.edges().sort_by_distance(p)[0] for p in [
        (-8.5, 2, 29.125),
        (-8.5, 2, 25.125),
        (-12.5, 4.5, 32.125),
        (12.5, 4.5, 32.125),
        (12.5, 4.5, 22.125),
        (-12.5, 4.5, 22.125),
    ]]
    fillet(fillet5_edges, radius=FILLET5_R - 0.0001)  # a hair under: the kernel refuses the full size


solid = part.part
